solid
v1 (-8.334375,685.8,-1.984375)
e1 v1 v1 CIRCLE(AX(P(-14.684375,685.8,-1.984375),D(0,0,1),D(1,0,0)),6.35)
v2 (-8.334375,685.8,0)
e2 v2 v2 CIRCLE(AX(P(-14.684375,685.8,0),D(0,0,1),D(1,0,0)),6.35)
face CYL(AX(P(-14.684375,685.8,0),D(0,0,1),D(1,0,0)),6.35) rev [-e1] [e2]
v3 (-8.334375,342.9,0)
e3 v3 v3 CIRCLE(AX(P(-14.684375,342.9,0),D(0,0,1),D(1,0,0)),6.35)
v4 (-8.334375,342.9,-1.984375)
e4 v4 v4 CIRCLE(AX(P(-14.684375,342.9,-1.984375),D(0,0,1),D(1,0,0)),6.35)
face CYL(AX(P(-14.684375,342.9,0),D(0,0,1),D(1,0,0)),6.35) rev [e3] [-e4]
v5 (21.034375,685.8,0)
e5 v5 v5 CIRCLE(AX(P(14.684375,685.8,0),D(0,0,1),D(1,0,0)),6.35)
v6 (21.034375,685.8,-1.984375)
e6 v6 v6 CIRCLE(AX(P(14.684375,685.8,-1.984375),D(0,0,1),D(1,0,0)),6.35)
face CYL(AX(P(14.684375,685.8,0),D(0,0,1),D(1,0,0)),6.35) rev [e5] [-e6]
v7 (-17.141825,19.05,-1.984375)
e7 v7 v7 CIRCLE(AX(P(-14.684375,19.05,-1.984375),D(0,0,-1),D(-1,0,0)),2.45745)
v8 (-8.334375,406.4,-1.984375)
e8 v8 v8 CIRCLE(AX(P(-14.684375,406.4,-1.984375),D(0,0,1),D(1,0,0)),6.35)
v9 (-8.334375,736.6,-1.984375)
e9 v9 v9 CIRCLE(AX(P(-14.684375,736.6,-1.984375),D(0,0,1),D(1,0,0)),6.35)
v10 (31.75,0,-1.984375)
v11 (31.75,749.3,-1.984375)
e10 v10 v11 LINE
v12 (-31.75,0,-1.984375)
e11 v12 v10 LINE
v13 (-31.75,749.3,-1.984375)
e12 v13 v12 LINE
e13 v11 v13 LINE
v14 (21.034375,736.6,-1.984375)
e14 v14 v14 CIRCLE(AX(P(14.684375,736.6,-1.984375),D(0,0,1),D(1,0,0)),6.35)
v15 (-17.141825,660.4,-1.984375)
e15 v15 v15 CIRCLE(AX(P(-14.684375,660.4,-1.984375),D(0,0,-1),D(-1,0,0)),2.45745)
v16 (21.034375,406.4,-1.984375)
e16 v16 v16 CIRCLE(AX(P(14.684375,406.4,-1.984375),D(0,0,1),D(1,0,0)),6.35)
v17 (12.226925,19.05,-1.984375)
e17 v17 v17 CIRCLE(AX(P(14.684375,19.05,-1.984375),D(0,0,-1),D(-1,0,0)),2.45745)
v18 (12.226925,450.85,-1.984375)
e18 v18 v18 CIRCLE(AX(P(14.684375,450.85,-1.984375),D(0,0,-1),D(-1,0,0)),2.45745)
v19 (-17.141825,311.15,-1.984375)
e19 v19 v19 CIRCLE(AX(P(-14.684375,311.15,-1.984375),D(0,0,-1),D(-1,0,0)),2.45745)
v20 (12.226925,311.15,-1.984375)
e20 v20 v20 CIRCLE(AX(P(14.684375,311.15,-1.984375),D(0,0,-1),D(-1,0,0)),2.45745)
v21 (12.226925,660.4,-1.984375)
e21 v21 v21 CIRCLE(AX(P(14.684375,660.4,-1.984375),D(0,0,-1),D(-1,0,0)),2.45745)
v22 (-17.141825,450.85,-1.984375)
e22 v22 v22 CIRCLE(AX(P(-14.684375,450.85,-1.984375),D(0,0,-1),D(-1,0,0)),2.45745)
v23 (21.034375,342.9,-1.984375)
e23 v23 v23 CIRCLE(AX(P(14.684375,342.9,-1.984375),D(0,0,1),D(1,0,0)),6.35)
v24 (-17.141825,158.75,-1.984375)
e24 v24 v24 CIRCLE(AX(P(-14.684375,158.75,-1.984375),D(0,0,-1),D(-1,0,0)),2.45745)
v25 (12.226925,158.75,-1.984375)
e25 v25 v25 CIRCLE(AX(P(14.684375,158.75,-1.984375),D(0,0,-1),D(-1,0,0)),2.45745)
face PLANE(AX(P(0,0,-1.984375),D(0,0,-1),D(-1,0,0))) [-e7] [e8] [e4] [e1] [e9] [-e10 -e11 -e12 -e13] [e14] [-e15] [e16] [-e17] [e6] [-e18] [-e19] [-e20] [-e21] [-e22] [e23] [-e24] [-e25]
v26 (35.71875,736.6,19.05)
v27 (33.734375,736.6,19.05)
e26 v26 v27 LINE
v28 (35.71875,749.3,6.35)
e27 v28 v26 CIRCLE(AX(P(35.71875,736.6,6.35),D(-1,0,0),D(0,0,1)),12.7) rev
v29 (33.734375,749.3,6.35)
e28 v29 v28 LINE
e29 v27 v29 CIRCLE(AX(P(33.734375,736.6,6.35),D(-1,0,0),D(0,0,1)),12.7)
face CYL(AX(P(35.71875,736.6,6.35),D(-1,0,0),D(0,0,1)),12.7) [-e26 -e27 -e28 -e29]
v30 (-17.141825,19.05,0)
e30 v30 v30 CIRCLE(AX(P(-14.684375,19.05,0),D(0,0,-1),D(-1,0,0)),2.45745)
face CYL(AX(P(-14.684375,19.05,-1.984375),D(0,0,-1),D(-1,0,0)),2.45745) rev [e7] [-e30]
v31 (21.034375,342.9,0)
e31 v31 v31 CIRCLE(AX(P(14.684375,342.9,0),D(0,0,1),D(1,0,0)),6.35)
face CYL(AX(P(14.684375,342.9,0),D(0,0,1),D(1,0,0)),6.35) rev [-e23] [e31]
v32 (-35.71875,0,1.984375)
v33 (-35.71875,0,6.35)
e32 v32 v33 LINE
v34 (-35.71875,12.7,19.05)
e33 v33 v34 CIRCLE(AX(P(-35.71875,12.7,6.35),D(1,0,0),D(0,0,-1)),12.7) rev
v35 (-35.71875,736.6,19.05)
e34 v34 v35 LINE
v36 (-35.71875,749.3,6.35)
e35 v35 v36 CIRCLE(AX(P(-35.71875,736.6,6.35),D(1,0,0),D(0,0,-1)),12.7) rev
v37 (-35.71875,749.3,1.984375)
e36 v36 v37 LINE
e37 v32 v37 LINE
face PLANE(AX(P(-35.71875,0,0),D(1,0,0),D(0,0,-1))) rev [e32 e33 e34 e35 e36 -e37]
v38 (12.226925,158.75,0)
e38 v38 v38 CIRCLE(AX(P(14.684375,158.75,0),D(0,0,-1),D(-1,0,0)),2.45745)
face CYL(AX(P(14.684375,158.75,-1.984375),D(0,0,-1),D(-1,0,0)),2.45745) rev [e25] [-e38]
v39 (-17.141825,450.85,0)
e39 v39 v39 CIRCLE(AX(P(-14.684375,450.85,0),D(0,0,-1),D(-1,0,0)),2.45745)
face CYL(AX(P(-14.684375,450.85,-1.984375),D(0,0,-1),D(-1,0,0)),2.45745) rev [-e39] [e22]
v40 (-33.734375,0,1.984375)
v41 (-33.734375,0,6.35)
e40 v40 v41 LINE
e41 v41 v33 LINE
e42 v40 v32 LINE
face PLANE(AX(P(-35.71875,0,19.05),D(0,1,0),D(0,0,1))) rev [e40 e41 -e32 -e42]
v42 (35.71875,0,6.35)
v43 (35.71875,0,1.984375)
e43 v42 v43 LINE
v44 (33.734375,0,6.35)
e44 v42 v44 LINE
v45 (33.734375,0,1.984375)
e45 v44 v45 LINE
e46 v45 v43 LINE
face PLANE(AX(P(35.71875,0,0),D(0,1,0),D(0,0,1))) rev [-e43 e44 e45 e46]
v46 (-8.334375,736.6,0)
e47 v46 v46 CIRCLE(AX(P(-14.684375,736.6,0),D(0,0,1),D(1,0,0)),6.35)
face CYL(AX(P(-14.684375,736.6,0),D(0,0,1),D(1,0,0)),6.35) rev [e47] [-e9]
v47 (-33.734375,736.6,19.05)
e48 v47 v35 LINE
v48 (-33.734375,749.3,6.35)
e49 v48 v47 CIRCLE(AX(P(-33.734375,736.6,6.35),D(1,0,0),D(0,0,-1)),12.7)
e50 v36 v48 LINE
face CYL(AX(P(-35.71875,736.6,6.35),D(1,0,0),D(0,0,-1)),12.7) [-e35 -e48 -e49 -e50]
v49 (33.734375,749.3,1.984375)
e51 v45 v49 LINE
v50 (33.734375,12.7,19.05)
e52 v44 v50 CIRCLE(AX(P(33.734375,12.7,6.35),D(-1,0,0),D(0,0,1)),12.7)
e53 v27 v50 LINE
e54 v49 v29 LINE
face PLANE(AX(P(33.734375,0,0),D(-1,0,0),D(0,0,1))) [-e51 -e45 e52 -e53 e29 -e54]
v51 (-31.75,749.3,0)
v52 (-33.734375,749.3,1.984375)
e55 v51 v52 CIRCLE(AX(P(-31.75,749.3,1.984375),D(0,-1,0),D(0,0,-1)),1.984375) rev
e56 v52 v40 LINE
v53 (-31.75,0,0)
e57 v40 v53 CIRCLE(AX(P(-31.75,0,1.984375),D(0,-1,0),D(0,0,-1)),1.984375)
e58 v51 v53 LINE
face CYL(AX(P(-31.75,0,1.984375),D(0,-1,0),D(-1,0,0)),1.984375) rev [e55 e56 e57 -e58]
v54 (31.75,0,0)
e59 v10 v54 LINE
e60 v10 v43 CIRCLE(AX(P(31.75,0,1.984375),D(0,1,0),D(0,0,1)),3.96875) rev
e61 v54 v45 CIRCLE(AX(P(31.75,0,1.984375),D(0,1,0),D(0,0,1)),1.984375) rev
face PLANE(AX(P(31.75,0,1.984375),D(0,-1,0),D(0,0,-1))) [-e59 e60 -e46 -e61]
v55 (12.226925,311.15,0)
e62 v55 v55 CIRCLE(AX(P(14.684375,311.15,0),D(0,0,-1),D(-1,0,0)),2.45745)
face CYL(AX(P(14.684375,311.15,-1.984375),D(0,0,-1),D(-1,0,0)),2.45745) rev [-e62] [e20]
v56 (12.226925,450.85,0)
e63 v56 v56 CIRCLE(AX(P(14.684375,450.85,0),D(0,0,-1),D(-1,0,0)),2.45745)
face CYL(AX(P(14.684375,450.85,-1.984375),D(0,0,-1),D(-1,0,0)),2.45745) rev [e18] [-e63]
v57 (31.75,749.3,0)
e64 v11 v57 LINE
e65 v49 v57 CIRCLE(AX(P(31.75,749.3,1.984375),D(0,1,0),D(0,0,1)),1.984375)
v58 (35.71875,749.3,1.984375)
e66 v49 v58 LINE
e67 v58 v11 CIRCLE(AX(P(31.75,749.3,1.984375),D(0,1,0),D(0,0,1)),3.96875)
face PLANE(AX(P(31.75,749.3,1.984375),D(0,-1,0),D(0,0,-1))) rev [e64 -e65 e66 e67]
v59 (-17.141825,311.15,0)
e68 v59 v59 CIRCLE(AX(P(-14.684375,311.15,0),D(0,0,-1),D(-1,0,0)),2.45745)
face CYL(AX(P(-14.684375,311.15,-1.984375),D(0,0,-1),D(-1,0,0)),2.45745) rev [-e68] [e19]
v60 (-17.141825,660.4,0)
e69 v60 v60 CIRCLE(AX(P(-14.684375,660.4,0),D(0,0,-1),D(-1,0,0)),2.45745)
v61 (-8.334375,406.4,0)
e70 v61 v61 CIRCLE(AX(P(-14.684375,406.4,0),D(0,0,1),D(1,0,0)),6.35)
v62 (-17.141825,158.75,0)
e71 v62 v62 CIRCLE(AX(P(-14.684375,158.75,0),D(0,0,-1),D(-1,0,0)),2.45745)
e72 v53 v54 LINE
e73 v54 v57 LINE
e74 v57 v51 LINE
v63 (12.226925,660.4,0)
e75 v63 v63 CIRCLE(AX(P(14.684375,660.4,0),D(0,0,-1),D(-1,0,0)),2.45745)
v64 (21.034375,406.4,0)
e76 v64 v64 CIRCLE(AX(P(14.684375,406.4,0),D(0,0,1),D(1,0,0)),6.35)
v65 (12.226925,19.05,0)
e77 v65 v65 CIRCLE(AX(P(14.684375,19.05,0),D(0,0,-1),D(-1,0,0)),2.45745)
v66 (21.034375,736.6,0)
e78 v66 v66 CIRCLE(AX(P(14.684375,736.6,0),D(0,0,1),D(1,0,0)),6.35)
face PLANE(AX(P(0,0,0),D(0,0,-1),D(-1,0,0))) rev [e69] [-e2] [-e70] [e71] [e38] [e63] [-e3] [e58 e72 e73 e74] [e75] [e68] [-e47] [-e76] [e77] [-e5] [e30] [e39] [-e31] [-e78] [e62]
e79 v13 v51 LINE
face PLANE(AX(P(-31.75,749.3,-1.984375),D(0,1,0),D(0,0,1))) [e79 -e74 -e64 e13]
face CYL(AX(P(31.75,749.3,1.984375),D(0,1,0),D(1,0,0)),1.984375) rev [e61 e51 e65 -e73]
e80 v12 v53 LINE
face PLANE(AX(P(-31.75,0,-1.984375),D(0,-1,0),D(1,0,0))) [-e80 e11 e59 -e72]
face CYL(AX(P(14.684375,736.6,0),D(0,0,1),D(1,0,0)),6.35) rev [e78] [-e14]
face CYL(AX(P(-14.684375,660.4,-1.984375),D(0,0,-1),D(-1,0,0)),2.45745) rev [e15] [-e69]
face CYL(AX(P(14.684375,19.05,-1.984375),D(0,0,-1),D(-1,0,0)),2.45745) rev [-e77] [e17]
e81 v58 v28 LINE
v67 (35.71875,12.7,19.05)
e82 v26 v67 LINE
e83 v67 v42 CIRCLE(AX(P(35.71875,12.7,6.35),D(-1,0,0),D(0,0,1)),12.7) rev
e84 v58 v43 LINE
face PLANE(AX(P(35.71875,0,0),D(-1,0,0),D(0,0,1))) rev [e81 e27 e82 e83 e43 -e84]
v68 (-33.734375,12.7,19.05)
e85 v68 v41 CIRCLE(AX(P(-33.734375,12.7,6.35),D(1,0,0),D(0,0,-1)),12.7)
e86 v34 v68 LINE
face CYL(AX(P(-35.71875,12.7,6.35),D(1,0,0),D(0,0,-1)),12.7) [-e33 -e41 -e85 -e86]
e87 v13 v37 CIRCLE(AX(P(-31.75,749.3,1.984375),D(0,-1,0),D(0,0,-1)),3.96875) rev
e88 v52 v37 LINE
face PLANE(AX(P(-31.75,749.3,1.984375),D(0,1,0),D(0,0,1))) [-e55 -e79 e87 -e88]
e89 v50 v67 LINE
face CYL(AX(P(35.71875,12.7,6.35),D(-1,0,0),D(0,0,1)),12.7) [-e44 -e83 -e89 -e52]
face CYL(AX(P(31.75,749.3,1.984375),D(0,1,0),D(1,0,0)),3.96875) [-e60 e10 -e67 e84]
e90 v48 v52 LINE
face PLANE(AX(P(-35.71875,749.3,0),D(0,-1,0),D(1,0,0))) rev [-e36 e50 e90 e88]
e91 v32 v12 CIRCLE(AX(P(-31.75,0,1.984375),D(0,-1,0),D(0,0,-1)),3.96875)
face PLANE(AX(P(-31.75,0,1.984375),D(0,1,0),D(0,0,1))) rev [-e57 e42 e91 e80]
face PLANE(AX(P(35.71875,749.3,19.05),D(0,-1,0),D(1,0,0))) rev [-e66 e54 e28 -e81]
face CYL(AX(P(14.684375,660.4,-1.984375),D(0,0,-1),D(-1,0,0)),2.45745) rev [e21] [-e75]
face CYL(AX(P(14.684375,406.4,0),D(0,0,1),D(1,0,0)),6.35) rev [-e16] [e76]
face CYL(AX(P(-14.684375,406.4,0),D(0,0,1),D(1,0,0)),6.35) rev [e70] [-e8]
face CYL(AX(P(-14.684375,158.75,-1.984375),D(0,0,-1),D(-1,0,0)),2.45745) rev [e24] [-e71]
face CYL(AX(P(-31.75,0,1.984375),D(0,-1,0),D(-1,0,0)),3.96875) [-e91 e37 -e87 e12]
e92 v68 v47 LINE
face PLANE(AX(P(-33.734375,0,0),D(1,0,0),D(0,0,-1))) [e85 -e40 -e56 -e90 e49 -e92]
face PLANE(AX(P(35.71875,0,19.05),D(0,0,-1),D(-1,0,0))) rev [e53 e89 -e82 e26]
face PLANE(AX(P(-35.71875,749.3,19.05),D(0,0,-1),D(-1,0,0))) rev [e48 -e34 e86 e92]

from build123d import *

# Parameters (mm, degrees)
SKETCH1_W                   = 63.5
SKETCH1_H                   = 749.3
BASE_FLANGE1_DEPTH          = 1.984375
F_1_2_0_5_DIAMETER_HOLE1_D  = 12.7
F_1_2_0_5_DIAMETER_HOLE2_D  = 12.7
EDGE_FLANGE2_DEPTH          = 749.3
EDGE_FLANGE2_BEND_DEPTH     = 749.3
F_10_0_201_DIAMETER_HOLE1_D = 4.9149
FILLET1_R                   = 12.7


# Sheet-metal steps are written as plain solids
with BuildPart() as part:
    # Sketch1 → Base-Flange1 (new body)
    with BuildSketch(Plane.XY):
        with Locations((0, 374.65)):
            Rectangle(SKETCH1_W, SKETCH1_H)
    extrude(amount=-BASE_FLANGE1_DEPTH)

    # 1/2 (0.5) Diameter Hole1 (through all)
    with Locations(Plane.XY):
        with Locations((-14.684375, 406.4), (14.684375, 406.4), (14.684375, 342.9), (-14.684375, 342.9)):
            Hole(F_1_2_0_5_DIAMETER_HOLE1_D / 2)

    # 1/2 (0.5) Diameter Hole2 (through all)
    with Locations(Plane.XY):
        with Locations((14.684375, 685.8), (14.684375, 736.6), (-14.684375, 736.6), (-14.684375, 685.8)):
            Hole(F_1_2_0_5_DIAMETER_HOLE2_D / 2)

    # Edge-Flange2 section (across the edge) → Edge-Flange2 (add)
    with BuildSketch(Plane(origin=(-33.734375, 749.3, 0), x_dir=(1, 0, 0), z_dir=(0, -1, 0))):
        with BuildLine():
            Line((-1.984375, 1.984375), (-1.984375, 19.05))
            Line((-1.984375, 19.05), (0, 19.05))
            Line((0, 19.05), (0, 1.984375))
            ThreePointArc((0, 1.984375), (0.581209981, 0.581209981), (1.984375, 0))
            Line((1.984375, 0), (1.984375, -1.984375))
            ThreePointArc((1.984375, -1.984375), (-0.821955038, -0.821955038), (-1.984375, 1.984375))
        make_face()
    extrude(amount=EDGE_FLANGE2_DEPTH)

    # Edge-Flange2 section 2 (across the edge) → Edge-Flange2 bend (add)
    with BuildSketch(Plane(origin=(33.734375, 0, 0), x_dir=(-1, 0, 0), z_dir=(0, 1, 0))):
        with BuildLine():
            Line((-1.984375, 1.984375), (-1.984375, 19.05))
            Line((-1.984375, 19.05), (0, 19.05))
            Line((0, 19.05), (0, 1.984375))
            ThreePointArc((0, 1.984375), (0.581209981, 0.581209981), (1.984375, 0))
            Line((1.984375, 0), (1.984375, -1.984375))
            ThreePointArc((1.984375, -1.984375), (-0.821955038, -0.821955038), (-1.984375, 1.984375))
        make_face()
    extrude(amount=EDGE_FLANGE2_BEND_DEPTH)

    # #10 (0.201) Diameter Hole1 (through all)
    with Locations(Plane(origin=(0, 0, -1.984375), x_dir=(-1, 0, 0), z_dir=(0, 0, -1))):
        with Locations((-14.684375, 19.05), (14.684375, 19.05), (-14.684375, 158.75), (14.684375, 158.75), (-14.684375, 311.15), (14.684375, 311.15), (-14.684375, 450.85), (14.684375, 450.85), (-14.684375, 660.4), (14.684375, 660.4)):
            Hole(F_10_0_201_DIAMETER_HOLE1_D / 2)

    # Fillet1
    fillet1_edges = [part.edges().sort_by_distance(p)[0] for p in [
        (-34.7265625, 749.3, 19.05),
        (-34.7265625, 0, 19.05),
        (34.7265625, 0, 19.05),
        (34.7265625, 749.3, 19.05),
    ]]
    fillet(fillet1_edges, radius=FILLET1_R)


solid = part.part
